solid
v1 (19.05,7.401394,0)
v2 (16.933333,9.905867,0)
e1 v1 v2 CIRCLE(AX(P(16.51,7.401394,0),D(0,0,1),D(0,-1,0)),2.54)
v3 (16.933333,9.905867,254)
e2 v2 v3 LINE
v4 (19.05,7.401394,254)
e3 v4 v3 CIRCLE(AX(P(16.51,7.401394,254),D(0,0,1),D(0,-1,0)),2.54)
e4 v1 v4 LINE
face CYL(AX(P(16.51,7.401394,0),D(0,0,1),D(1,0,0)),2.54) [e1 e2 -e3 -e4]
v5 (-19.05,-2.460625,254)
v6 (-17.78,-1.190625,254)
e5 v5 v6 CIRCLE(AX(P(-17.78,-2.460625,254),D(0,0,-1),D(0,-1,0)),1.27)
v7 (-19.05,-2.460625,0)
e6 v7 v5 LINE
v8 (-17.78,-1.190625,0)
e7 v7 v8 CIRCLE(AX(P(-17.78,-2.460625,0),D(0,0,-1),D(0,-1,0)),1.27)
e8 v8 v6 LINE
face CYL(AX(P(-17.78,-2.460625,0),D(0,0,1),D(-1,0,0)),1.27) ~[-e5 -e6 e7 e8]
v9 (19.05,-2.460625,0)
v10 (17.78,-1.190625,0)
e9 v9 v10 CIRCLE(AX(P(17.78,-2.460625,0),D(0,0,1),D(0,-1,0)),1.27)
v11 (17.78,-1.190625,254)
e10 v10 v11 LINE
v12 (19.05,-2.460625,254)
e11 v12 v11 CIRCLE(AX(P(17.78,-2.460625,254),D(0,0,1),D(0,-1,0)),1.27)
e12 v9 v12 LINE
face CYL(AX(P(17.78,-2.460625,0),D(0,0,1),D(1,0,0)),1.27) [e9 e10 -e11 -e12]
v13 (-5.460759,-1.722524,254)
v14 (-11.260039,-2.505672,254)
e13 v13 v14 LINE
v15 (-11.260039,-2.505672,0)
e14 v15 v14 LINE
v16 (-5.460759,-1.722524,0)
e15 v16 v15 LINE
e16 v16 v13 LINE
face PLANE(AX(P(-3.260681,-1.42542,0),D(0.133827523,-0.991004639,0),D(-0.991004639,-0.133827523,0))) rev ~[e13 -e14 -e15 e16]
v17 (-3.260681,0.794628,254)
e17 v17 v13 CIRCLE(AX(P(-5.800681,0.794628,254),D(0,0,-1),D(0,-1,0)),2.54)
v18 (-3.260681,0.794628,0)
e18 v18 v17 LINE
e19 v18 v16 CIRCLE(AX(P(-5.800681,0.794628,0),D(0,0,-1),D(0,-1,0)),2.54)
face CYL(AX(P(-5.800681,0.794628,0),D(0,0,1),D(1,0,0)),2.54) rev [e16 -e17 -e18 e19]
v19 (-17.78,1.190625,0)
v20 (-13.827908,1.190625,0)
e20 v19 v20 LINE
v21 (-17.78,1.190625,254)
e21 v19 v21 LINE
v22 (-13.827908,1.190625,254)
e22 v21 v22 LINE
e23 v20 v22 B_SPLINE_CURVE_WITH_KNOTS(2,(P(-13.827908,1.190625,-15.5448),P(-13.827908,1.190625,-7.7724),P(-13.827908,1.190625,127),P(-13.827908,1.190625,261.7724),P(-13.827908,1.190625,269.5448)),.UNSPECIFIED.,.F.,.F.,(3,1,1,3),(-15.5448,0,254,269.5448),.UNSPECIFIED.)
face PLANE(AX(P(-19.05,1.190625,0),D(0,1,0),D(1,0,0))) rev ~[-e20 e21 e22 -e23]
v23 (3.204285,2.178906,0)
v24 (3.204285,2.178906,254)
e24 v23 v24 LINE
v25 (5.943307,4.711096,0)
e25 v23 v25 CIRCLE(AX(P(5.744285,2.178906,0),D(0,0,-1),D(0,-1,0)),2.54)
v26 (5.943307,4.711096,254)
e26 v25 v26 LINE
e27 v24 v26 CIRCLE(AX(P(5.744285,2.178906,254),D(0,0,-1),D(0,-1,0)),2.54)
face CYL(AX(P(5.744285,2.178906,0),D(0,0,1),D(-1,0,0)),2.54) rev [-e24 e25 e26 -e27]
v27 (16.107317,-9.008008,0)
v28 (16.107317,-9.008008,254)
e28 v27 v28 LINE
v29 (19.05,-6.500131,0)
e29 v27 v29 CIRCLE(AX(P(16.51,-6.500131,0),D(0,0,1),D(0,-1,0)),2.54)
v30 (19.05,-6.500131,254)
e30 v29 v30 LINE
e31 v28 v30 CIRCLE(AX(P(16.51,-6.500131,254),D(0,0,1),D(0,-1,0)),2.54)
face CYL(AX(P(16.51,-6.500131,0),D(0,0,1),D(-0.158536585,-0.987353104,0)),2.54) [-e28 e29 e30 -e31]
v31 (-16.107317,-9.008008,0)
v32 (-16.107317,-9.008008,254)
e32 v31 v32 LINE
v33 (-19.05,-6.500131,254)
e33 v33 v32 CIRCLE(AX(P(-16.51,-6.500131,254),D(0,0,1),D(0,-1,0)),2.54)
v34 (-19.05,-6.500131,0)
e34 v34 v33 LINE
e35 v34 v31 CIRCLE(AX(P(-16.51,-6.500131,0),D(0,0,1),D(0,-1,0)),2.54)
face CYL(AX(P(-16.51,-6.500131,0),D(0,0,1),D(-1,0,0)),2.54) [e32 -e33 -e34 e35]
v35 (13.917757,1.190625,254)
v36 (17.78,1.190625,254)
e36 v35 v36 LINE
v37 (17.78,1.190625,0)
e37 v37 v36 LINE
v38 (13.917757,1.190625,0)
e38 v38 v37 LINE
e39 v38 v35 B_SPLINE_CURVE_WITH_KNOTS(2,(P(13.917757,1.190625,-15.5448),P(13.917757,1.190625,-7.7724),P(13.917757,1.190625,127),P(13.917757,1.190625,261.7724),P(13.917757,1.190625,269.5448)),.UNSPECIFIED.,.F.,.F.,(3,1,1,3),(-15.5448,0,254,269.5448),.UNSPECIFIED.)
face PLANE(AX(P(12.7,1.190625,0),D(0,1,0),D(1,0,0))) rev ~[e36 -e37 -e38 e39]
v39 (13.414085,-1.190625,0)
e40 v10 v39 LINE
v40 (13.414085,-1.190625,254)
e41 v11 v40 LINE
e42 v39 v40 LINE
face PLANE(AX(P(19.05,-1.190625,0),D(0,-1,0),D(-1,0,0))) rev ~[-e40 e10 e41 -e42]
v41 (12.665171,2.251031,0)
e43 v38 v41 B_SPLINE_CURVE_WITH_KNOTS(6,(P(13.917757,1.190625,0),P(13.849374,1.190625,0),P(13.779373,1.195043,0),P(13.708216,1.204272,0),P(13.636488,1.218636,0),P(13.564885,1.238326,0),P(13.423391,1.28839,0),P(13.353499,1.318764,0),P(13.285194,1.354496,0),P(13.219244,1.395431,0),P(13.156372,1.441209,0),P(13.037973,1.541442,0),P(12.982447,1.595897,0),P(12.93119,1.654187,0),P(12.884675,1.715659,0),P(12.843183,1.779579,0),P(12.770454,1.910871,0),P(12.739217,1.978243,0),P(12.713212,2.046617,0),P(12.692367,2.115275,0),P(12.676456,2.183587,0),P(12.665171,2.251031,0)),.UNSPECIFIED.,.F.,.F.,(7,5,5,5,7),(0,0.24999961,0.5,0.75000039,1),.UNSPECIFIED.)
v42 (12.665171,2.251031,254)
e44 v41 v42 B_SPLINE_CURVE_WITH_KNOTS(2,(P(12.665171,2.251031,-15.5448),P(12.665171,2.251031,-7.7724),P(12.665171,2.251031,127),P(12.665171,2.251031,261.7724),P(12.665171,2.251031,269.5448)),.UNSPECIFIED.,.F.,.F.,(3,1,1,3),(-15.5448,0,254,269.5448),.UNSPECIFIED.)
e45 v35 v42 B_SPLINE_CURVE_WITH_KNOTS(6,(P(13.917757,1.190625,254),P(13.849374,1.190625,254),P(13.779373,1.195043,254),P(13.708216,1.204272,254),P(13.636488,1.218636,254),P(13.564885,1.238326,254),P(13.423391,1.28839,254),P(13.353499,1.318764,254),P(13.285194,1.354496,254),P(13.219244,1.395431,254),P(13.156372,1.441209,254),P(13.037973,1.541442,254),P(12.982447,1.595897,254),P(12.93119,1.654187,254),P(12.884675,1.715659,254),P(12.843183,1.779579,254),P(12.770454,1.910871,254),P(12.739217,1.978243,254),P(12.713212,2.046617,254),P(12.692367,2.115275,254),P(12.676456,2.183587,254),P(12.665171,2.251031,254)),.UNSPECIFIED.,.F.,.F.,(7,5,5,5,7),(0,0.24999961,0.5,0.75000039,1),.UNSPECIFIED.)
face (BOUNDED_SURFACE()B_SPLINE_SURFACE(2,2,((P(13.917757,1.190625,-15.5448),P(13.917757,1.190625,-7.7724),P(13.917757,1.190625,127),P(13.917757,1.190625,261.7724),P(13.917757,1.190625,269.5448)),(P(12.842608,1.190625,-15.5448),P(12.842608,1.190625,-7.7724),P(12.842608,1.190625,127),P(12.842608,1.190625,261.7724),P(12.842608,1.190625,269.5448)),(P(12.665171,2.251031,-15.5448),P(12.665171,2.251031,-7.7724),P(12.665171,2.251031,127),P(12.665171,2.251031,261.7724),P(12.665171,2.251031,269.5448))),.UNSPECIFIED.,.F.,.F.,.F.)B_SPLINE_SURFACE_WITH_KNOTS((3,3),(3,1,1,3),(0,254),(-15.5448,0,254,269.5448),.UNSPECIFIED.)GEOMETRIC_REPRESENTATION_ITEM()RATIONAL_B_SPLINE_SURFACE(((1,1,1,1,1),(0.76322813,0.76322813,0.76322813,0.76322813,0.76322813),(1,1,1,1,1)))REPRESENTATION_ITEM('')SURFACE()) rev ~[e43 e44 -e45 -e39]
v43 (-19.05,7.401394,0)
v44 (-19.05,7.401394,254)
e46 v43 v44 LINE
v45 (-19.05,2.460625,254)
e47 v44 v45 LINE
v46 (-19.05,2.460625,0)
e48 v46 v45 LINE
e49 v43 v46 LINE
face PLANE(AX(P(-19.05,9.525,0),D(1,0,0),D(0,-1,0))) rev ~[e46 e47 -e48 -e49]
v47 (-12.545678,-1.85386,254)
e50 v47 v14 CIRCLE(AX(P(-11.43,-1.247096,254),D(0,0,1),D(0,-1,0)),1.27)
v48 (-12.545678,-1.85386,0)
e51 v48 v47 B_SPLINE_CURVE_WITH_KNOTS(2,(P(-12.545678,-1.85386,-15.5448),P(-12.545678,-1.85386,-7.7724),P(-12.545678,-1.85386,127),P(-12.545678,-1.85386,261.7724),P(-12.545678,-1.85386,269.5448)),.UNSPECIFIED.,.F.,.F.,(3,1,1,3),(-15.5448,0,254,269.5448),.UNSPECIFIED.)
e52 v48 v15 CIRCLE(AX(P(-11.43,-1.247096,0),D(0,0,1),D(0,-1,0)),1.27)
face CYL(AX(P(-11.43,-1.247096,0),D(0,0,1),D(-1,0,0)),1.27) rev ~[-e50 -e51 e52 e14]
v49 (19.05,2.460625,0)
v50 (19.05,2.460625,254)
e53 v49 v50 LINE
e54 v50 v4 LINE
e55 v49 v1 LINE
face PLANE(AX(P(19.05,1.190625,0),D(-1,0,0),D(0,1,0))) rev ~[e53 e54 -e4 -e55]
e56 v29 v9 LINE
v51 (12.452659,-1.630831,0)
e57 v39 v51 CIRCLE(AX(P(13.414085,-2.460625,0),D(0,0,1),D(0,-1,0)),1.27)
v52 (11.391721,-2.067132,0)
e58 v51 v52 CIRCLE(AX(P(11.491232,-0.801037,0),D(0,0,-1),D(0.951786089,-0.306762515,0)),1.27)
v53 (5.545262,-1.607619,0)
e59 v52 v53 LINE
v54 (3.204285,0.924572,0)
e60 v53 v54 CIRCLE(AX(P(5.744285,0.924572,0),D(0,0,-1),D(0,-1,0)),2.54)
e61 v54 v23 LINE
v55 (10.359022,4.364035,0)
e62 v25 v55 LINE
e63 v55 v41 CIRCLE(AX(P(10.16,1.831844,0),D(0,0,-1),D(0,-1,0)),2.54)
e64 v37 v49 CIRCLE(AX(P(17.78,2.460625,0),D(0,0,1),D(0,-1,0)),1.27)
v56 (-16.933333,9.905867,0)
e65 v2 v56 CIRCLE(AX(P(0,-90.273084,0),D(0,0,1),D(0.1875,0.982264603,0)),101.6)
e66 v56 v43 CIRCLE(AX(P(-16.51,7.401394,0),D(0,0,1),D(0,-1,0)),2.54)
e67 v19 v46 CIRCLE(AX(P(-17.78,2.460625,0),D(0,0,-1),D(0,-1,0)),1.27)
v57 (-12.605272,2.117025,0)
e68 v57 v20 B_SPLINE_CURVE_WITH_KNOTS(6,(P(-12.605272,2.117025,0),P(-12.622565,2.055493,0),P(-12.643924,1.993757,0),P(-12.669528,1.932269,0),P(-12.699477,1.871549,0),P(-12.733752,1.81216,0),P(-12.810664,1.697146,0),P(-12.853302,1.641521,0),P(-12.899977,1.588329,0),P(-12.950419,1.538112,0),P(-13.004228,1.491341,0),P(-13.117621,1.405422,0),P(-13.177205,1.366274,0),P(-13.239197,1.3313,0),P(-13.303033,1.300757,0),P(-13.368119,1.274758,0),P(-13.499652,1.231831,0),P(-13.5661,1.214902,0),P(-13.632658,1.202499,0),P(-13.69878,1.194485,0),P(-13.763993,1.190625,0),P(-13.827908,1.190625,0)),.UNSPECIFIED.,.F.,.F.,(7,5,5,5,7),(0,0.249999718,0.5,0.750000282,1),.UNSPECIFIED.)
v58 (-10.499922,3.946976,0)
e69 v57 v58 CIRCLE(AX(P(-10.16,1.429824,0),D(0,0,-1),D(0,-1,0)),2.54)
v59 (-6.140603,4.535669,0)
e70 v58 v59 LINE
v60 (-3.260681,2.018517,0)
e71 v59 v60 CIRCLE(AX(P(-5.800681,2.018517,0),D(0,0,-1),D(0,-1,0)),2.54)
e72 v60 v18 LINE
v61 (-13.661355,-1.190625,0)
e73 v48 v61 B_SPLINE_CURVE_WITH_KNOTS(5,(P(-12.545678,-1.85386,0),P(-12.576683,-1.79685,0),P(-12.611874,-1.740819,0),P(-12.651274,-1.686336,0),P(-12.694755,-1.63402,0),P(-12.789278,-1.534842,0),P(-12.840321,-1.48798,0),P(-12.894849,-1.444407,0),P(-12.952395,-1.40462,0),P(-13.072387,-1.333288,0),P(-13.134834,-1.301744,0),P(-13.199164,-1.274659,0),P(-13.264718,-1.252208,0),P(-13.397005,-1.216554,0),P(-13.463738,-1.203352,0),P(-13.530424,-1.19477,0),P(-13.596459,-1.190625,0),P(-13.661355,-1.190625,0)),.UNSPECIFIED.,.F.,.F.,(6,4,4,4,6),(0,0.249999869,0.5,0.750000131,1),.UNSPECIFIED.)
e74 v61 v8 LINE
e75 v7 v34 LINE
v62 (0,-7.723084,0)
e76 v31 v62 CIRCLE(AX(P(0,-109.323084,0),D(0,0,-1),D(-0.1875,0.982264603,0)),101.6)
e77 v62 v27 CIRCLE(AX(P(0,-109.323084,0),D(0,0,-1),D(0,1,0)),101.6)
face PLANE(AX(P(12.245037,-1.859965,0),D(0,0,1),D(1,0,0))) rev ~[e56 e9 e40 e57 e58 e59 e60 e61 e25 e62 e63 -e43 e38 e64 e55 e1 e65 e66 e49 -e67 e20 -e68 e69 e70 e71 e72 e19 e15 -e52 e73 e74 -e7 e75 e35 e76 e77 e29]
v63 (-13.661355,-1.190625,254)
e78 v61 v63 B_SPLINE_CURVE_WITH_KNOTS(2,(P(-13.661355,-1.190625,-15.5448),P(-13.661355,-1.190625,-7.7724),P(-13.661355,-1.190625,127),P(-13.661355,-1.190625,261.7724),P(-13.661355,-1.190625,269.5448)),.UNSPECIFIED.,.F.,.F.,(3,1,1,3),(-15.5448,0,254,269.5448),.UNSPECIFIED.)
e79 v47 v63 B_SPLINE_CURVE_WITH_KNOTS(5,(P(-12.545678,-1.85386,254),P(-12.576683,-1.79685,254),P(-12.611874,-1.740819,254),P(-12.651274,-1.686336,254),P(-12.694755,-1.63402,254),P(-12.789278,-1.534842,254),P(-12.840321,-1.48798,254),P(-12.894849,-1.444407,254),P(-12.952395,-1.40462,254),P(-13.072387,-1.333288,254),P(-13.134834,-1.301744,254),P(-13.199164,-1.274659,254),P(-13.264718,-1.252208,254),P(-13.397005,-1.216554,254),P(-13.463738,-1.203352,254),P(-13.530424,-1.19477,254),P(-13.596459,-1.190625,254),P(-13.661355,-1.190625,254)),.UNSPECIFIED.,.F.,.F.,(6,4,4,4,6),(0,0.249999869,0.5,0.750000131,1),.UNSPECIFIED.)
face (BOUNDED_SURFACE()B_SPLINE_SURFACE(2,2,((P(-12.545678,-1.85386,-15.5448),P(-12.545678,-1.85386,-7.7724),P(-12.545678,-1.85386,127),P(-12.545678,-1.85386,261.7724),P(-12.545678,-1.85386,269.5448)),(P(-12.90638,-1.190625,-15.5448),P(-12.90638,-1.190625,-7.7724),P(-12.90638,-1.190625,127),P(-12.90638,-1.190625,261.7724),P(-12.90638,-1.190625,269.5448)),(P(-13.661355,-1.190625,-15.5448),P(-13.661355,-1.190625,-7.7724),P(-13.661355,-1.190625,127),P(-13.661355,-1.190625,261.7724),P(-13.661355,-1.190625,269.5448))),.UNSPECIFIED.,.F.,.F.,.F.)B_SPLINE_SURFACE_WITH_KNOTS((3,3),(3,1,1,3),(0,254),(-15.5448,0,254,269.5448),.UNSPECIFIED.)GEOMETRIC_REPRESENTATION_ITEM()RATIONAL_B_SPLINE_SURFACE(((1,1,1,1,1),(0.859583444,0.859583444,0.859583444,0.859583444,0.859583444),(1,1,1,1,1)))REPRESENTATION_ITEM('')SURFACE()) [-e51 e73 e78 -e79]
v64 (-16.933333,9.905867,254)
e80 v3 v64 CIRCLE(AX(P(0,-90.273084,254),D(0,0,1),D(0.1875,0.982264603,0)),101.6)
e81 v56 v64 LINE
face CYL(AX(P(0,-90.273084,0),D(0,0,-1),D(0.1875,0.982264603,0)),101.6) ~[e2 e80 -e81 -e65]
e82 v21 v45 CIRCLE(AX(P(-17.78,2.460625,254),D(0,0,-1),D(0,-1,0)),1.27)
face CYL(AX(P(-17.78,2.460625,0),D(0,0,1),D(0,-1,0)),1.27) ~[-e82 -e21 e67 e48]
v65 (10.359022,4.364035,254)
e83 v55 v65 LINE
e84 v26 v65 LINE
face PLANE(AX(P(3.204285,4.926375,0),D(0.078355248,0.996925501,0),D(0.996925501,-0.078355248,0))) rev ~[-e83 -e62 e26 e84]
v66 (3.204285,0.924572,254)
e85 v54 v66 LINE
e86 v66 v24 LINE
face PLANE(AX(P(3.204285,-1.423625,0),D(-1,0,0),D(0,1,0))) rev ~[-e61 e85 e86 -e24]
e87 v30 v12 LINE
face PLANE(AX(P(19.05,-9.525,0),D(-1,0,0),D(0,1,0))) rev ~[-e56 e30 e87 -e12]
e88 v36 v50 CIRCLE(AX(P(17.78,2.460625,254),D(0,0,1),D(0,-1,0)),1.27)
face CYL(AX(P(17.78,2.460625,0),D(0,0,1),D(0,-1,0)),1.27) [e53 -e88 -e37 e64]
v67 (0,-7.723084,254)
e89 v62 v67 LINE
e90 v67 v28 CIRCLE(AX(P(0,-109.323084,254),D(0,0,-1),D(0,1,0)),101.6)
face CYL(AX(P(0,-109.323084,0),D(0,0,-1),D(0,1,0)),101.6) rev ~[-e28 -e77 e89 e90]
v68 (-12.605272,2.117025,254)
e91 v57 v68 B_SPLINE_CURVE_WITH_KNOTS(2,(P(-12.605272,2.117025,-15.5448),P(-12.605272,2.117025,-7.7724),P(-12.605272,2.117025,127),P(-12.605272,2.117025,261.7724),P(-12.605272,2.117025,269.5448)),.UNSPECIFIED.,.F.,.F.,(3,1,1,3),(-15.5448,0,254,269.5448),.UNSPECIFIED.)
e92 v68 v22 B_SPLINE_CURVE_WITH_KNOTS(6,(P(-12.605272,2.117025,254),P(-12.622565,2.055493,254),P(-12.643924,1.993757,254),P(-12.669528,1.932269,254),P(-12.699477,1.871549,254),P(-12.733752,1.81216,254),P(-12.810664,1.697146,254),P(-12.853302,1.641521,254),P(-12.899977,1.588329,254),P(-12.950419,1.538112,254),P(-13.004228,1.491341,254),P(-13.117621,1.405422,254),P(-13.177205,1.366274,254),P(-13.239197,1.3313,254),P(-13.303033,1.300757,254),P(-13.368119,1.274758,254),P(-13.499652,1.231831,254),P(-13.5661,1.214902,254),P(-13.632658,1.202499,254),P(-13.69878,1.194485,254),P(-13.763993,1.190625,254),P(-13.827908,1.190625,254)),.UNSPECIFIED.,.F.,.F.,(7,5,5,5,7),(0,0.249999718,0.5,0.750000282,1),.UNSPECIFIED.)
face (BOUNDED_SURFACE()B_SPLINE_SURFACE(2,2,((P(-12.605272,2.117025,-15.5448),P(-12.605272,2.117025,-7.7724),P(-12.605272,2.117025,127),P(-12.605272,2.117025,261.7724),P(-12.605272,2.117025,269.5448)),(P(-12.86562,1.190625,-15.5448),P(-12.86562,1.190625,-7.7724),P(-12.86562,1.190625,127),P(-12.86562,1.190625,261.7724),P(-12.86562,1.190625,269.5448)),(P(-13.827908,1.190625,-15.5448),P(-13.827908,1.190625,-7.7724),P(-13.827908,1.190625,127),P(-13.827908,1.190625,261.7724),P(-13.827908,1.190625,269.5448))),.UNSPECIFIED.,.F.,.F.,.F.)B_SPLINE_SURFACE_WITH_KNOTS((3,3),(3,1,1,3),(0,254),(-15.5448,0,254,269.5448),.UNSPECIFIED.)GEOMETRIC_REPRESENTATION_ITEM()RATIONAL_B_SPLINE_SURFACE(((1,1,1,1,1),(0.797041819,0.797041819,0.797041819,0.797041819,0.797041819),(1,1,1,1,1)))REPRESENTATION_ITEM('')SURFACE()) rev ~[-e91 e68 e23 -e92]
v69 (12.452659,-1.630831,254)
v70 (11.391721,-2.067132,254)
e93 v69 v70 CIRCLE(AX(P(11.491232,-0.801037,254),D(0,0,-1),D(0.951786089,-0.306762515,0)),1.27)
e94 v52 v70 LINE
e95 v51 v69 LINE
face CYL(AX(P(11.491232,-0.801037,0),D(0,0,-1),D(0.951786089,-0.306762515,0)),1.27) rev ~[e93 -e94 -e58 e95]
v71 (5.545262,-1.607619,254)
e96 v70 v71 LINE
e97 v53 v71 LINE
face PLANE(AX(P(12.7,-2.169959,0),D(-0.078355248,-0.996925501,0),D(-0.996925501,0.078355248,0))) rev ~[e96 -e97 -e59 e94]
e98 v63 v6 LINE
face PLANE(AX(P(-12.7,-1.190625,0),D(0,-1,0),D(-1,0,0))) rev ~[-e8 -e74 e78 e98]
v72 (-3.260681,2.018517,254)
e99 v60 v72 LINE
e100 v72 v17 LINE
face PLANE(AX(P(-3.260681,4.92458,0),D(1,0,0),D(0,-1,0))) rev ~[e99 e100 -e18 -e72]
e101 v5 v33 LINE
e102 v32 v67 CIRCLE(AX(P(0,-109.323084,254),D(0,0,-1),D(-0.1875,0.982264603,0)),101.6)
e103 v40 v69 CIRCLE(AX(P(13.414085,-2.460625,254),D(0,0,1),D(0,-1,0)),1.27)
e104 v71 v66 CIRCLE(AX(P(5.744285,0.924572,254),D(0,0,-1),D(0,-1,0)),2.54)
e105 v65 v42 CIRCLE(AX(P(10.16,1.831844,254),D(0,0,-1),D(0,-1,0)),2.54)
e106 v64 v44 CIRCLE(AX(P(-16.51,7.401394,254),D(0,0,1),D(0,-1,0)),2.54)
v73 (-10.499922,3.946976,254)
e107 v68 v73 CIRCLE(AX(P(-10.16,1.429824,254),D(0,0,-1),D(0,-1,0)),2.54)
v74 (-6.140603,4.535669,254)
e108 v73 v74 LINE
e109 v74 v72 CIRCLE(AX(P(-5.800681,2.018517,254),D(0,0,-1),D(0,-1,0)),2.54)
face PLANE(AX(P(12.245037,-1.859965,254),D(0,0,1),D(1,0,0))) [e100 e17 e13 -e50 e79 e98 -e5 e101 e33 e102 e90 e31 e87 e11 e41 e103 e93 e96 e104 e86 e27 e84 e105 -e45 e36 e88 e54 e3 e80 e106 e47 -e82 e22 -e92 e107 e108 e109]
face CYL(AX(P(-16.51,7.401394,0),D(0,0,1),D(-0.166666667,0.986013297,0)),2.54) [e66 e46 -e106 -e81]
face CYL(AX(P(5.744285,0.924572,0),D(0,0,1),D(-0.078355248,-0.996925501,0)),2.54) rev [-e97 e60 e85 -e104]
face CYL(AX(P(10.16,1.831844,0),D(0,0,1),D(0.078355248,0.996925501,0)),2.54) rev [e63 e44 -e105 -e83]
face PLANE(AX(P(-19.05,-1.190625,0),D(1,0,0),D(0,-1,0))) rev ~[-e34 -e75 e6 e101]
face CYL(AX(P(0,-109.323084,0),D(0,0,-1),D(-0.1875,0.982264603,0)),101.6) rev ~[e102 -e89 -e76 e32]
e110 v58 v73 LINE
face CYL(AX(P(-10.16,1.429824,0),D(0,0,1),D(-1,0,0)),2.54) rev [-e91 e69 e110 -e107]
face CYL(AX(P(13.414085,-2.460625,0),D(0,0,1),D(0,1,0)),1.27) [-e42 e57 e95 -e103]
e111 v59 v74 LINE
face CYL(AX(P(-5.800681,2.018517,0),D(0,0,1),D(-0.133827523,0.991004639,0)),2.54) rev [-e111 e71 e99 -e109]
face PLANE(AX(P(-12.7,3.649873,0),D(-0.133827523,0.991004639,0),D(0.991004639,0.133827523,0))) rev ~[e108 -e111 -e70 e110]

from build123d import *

# Parameters (mm, degrees)
F1_DEPTH    = 254
F2_R        = 2.54
F3_R        = 1.27
F4_T1_DEPTH = 254
F5_R        = 1.27
F6_R        = 1.27
F7_R        = 1.27


# Not quite as in the source:
# - a fillet or chamfer that OpenCascade refuses, or shapes differently, is made with other operations: its cross-section is extruded or revolved along the edge and cut away or added


with BuildPart() as f1:
    # F0 (on Top) → F1 (new body)
    with BuildSketch(Plane.XY):
        with BuildLine():
            ThreePointArc((0, -7.7230836489), (9.5675153846, -8.1745658676), (19.05, -9.525))
            Line((19.05, -9.525), (19.05, -1.190625))
            Line((19.05, -1.190625), (12.7, -1.190625))
            Line((12.7, -1.190625), (12.7, -2.1699586974))
            Line((12.7, -2.1699586974), (3.2042846004, -1.4236249591))
            Line((3.2042846004, -1.4236249591), (3.2042846004, 1.7513750409))
            Line((3.2042846004, 1.7513750409), (3.2042846004, 4.9263750409))
            Line((3.2042846004, 4.9263750409), (12.7, 4.1800413026))
            Line((12.7, 4.1800413026), (12.7, 1.190625))
            Line((12.7, 1.190625), (19.05, 1.190625))
            Line((19.05, 1.190625), (19.05, 9.525))
            ThreePointArc((19.05, 9.525), (0, 11.3269163511), (-19.05, 9.525))
            Line((-19.05, 9.525), (-19.05, 1.190625))
            Line((-19.05, 1.190625), (-12.7, 1.190625))
            Line((-12.7, 1.190625), (-12.7, 3.6498726836))
            Line((-12.7, 3.6498726836), (-3.2606808159, 4.9245798427))
            Line((-3.2606808159, 4.9245798427), (-3.2606808159, 1.7495798427))
            Line((-3.2606808159, 1.7495798427), (-3.2606808159, -1.4254201573))
            Line((-3.2606808159, -1.4254201573), (-12.7, -2.7001273164))
            Line((-12.7, -2.7001273164), (-12.7, -1.190625))
            Line((-12.7, -1.190625), (-19.05, -1.190625))
            Line((-19.05, -1.190625), (-19.05, -9.525))
            ThreePointArc((-19.05, -9.525), (-9.5675153846, -8.1745658676), (0, -7.7230836489))
        make_face()
    extrude(amount=F1_DEPTH)

    # F2
    f2_edges = [f1.edges().sort_by_distance(p)[0] for p in [
        (19.05, -9.525, 127),
        (19.05, 9.525, 127),
        (-19.05, -9.525, 127),
        (-19.05, 9.525, 127),
        (-12.7, 3.649873, 127),
        (3.204285, 4.926375, 127),
        (3.204285, -1.423625, 127),
        (12.7, 4.180041, 127),
        (-3.260681, 4.92458, 127),
        (-3.260681, -1.42542, 127),
    ]]
    fillet(f2_edges, radius=F2_R)

    # F3
    f3_edges = [f1.edges().sort_by_distance(p)[0] for p in [
        (19.05, -1.190625, 127),
        (19.05, 1.190625, 127),
        (-19.05, -1.190625, 127),
        (-19.05, 1.190625, 127),
    ]]
    fillet(f3_edges, radius=F3_R)

    # F4: fillet of radius 1.27 on 1 edges, made by hand

    # F4_s2 → F4_t1 (join)
    with BuildSketch(Plane.XY):
        with BuildLine():
            ThreePointArc((12.7, -1.190625), (12.1981114255, -1.8561294958), (11.3917205019, -2.0671319921))
            Line((11.3917205019, -2.0671319921), (12.7, -2.1699586974))
            Line((12.7, -2.1699586974), (12.7, -1.190625))
        make_face()
    extrude(amount=F4_T1_DEPTH)

    # F5
    f5_edges = [f1.edges().sort_by_distance(p)[0] for p in [
        (-12.7, -2.700127, 127),
    ]]
    fillet(f5_edges, radius=F5_R)

    # F6
    f6_edges = [f1.edges().sort_by_distance(p)[0] for p in [
        (-12.7, 1.190625, 127),
        (-12.7, -1.190625, 127),
        (12.7, 1.190625, 127),
    ]]
    fillet(f6_edges, radius=F6_R)

    # F7
    f7_edges = [f1.edges().sort_by_distance(p)[0] for p in [
        (12.7, -1.190625, 127),
    ]]
    fillet(f7_edges, radius=F7_R)


solid = f1.part
